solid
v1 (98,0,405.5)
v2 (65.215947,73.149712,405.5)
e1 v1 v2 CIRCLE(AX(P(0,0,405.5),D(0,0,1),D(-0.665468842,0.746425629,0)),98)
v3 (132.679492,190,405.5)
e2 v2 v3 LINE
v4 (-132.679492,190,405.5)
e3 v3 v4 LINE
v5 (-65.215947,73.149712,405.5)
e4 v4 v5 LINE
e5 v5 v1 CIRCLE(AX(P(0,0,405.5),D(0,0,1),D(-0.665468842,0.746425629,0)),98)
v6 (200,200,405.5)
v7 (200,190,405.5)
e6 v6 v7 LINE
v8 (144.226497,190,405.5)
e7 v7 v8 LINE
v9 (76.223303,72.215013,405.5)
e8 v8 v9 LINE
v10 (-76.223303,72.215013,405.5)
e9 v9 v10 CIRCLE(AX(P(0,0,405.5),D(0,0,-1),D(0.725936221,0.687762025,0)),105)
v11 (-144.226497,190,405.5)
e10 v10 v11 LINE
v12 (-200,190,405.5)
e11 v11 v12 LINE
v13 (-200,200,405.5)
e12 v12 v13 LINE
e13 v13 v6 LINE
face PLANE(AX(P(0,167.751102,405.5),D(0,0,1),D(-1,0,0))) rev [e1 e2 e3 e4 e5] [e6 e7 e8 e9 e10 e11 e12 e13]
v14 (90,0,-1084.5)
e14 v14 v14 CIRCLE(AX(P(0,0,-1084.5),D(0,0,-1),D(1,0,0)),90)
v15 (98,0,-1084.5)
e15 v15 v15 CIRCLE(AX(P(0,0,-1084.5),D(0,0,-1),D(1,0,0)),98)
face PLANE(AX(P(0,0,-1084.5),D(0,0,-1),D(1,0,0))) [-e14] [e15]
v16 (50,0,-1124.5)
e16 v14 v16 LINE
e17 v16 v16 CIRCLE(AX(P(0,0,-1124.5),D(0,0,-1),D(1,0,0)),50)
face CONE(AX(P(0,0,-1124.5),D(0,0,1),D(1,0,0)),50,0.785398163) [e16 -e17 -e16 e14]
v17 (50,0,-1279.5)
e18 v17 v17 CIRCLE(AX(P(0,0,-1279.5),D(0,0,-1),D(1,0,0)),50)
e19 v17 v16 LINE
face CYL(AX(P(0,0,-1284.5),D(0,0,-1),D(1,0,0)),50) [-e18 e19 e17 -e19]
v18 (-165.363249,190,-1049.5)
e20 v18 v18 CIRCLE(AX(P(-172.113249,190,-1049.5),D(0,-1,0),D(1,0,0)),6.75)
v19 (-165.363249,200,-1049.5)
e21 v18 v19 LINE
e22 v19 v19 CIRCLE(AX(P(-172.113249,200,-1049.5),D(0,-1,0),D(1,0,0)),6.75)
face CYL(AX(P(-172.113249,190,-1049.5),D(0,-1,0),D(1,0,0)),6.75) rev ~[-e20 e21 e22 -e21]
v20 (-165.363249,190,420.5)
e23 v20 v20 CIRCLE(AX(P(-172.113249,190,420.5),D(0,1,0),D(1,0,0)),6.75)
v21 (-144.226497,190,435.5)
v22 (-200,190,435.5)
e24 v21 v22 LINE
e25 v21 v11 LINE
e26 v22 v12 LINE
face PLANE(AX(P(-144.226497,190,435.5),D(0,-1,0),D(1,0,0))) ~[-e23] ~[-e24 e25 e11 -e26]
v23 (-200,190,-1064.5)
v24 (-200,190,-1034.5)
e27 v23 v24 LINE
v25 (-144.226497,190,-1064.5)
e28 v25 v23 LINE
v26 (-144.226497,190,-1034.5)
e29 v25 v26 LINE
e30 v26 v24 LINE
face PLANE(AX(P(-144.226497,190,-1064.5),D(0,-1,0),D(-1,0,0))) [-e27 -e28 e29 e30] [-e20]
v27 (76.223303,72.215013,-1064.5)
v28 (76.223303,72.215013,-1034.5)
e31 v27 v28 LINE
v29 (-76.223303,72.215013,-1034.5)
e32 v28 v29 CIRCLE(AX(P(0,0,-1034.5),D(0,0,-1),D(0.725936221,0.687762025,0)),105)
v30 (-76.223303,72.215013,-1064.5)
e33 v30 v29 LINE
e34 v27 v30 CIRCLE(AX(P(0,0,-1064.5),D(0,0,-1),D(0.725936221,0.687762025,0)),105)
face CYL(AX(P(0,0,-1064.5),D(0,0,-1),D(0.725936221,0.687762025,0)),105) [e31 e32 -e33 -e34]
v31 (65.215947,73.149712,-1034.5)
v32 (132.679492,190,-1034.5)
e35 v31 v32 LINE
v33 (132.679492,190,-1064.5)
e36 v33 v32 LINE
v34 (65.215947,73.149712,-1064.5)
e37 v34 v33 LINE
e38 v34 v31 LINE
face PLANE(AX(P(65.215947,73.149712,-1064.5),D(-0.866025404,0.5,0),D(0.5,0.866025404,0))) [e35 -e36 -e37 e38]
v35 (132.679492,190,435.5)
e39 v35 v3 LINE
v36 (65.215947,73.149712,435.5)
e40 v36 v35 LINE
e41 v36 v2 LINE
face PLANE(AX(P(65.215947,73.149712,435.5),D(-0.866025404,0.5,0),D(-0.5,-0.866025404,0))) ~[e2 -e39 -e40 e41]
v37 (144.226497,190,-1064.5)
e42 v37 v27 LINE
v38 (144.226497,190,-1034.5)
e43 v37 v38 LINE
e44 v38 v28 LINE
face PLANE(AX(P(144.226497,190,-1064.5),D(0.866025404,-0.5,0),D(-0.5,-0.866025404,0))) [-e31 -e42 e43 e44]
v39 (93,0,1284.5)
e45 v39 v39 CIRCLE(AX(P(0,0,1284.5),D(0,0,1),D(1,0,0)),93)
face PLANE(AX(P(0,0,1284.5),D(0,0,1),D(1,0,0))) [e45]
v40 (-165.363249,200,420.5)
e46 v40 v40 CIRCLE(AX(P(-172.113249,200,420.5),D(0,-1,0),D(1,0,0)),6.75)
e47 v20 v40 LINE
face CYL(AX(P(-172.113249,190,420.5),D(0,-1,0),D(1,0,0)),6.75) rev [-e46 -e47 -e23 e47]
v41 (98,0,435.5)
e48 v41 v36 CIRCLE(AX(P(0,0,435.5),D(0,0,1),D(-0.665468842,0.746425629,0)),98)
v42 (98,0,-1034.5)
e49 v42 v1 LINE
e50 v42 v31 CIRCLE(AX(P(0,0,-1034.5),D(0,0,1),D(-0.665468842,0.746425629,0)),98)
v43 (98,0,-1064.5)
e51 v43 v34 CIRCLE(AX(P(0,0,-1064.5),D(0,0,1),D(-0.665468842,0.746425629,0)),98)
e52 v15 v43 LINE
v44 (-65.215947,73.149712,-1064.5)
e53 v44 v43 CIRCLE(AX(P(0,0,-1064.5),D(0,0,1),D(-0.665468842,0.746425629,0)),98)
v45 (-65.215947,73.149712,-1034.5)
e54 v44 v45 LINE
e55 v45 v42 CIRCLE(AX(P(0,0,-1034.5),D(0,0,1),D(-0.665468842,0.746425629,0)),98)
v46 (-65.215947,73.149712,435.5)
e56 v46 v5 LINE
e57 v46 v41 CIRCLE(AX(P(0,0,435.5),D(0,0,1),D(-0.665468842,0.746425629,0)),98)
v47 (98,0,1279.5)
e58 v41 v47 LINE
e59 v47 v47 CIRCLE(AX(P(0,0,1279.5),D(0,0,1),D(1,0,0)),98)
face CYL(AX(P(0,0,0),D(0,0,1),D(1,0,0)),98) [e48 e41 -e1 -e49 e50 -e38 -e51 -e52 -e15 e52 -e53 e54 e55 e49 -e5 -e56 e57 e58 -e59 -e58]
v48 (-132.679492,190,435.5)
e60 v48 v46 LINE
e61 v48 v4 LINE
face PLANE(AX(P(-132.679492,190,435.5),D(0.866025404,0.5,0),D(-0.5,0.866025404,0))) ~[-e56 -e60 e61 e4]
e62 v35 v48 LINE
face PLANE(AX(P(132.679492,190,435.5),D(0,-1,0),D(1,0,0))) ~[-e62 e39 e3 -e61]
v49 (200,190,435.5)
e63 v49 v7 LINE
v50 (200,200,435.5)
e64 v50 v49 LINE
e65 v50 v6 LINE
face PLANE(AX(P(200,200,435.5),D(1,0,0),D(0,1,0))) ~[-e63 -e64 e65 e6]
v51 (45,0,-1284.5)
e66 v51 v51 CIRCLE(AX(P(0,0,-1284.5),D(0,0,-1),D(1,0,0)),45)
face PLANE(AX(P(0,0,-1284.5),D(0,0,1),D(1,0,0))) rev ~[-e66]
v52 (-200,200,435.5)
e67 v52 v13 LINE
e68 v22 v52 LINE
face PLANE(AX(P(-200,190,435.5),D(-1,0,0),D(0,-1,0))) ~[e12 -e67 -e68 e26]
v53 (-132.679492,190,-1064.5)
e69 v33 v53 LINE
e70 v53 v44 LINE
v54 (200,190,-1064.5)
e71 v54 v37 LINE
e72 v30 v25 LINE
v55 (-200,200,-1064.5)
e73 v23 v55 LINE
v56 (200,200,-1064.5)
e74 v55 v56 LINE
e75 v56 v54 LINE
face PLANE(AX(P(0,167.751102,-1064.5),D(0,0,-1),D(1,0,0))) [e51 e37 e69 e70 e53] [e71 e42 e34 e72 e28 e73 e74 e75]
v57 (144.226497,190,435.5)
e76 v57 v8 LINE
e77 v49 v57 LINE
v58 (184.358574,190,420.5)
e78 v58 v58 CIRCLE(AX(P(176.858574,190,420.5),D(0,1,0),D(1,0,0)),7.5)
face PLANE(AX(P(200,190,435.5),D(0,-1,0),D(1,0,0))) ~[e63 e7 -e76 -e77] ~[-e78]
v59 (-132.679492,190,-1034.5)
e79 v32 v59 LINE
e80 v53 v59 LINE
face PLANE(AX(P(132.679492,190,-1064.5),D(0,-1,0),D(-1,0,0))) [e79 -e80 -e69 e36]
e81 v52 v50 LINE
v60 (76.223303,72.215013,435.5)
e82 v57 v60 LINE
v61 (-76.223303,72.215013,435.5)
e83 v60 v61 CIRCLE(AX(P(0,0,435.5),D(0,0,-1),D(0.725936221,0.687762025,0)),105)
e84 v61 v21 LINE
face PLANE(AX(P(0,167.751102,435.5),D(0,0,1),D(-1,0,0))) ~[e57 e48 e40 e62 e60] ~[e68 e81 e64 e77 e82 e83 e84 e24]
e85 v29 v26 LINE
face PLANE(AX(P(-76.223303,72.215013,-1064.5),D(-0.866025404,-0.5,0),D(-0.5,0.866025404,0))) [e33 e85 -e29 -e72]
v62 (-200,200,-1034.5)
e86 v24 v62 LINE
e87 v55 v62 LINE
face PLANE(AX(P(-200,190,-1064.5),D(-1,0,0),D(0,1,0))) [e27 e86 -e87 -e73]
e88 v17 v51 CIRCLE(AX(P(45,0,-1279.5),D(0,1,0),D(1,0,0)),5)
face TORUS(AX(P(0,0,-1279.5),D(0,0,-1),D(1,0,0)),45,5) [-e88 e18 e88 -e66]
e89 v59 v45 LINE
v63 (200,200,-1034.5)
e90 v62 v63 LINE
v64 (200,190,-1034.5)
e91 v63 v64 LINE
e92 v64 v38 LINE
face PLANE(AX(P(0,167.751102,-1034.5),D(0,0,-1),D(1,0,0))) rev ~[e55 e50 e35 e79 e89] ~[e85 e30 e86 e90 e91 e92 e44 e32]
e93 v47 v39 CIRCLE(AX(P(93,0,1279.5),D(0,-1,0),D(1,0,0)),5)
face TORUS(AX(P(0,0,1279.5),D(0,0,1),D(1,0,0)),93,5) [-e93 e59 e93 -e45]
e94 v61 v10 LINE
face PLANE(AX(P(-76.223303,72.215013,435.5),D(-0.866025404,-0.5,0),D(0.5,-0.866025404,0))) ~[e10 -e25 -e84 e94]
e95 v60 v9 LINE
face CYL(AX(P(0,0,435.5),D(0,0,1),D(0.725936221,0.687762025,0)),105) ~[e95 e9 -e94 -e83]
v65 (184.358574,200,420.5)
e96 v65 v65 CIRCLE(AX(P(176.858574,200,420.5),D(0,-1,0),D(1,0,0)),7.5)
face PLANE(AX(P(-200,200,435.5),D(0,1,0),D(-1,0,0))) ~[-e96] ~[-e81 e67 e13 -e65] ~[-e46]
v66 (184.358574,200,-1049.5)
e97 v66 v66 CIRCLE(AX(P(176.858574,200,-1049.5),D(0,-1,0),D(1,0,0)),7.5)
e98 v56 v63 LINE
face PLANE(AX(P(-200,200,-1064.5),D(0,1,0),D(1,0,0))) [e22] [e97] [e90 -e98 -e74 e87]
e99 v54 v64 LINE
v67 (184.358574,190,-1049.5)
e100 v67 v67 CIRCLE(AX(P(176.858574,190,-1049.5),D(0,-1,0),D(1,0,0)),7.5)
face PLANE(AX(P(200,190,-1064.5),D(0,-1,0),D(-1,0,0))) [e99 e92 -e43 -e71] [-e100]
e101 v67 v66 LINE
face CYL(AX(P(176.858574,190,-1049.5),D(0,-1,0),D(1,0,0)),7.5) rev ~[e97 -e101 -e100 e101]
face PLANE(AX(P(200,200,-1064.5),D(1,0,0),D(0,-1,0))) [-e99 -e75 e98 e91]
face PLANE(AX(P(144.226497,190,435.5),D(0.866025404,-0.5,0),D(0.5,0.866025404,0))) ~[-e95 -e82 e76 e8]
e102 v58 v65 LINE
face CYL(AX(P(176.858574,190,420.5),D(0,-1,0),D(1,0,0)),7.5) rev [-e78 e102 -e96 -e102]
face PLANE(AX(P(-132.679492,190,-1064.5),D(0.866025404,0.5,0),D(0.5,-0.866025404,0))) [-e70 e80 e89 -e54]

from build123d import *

# Parameters (mm, degrees)
F0_R      = 98
F1_DEPTH  = 1284.5
F2_R      = 98
F2_R_2    = 50
F3_DEPTH  = 200
F4_SIZE   = 40
F5_R      = 5
F8_DEPTH  = 30
F9_R      = 6.75
F9_R_2    = 7.5
F10_DEPTH = 10.001


# Not quite as in the source:
# - a pattern or mirror of a feature is missing from the dataset's text; its kind, count and spacing are read off the source's solid


with BuildPart() as f1:
    # F0 (on Top) → F1 (new body, symmetric)
    with BuildSketch(Plane.XY):
        Circle(F0_R)
    extrude(amount=F1_DEPTH, both=True)

    # F2 (on face) → F3 (cut)
    with BuildSketch(Plane(origin=(0, 0, -1284.5), x_dir=(1, 0, 0), z_dir=(0, 0, -1))):
        Circle(F2_R)
        Circle(F2_R_2, mode=Mode.SUBTRACT)
    extrude(amount=-F3_DEPTH, mode=Mode.SUBTRACT)

    # F4
    f4_edges = [f1.edges().sort_by_distance(p)[0] for p in [
        (-50, 0, -1084.5),
    ]]
    chamfer(f4_edges, length=F4_SIZE)

    # F5
    f5_edges = [f1.edges().sort_by_distance(p)[0] for p in [
        (-50, 0, -1284.5),
        (-98, 0, 1284.5),
    ]]
    fillet(f5_edges, radius=F5_R)

    # F7 (on offset) → F8 (join)
    with BuildSketch(Plane(origin=(0, 0, -1064.5), x_dir=(1, 0, 0), z_dir=(0, 0, -1))):
        Polygon((76.2233031652, -72.2150126676), (65.2159465136, -73.14971169), (132.6794919243, -190), (-132.6794919243, -190), (-65.2159465136, -73.14971169), (-76.2233031652, -72.2150126676), (-144.2264973081, -190), (-200, -190), (-200, -200), (-150, -200), (150, -200), (200, -200), (200, -190), (144.2264973081, -190), align=None)
        with BuildLine():
            ThreePointArc((-65.2159465136, -73.14971169), (0, 98), (65.2159465136, -73.14971169))
            Line((65.2159465136, -73.14971169), (76.2233031652, -72.2150126676))
            ThreePointArc((76.2233031652, -72.2150126676), (0, 105), (-76.2233031652, -72.2150126676))
            Line((-76.2233031652, -72.2150126676), (-65.2159465136, -73.14971169))
        make_face()
    f8 = extrude(amount=-F8_DEPTH)

    # F8_copies: F8 across plane
    add(f8.mirror(Plane.XY.offset(-314.5)))

    # F9 (on face) → F10 (cut, through all)
    with BuildSketch(Plane.XZ.offset(-190)):
        with Locations((-172.1132486541, -1049.5)):
            Circle(F9_R)
        with Locations((176.858574152, -1049.5)):
            Circle(F9_R_2)
    f10 = extrude(amount=-F10_DEPTH, mode=Mode.SUBTRACT)

    # F10_copies: F10 across plane
    add(f10.mirror(Plane.XY.offset(-314.5)), mode=Mode.SUBTRACT)


solid = f1.part
